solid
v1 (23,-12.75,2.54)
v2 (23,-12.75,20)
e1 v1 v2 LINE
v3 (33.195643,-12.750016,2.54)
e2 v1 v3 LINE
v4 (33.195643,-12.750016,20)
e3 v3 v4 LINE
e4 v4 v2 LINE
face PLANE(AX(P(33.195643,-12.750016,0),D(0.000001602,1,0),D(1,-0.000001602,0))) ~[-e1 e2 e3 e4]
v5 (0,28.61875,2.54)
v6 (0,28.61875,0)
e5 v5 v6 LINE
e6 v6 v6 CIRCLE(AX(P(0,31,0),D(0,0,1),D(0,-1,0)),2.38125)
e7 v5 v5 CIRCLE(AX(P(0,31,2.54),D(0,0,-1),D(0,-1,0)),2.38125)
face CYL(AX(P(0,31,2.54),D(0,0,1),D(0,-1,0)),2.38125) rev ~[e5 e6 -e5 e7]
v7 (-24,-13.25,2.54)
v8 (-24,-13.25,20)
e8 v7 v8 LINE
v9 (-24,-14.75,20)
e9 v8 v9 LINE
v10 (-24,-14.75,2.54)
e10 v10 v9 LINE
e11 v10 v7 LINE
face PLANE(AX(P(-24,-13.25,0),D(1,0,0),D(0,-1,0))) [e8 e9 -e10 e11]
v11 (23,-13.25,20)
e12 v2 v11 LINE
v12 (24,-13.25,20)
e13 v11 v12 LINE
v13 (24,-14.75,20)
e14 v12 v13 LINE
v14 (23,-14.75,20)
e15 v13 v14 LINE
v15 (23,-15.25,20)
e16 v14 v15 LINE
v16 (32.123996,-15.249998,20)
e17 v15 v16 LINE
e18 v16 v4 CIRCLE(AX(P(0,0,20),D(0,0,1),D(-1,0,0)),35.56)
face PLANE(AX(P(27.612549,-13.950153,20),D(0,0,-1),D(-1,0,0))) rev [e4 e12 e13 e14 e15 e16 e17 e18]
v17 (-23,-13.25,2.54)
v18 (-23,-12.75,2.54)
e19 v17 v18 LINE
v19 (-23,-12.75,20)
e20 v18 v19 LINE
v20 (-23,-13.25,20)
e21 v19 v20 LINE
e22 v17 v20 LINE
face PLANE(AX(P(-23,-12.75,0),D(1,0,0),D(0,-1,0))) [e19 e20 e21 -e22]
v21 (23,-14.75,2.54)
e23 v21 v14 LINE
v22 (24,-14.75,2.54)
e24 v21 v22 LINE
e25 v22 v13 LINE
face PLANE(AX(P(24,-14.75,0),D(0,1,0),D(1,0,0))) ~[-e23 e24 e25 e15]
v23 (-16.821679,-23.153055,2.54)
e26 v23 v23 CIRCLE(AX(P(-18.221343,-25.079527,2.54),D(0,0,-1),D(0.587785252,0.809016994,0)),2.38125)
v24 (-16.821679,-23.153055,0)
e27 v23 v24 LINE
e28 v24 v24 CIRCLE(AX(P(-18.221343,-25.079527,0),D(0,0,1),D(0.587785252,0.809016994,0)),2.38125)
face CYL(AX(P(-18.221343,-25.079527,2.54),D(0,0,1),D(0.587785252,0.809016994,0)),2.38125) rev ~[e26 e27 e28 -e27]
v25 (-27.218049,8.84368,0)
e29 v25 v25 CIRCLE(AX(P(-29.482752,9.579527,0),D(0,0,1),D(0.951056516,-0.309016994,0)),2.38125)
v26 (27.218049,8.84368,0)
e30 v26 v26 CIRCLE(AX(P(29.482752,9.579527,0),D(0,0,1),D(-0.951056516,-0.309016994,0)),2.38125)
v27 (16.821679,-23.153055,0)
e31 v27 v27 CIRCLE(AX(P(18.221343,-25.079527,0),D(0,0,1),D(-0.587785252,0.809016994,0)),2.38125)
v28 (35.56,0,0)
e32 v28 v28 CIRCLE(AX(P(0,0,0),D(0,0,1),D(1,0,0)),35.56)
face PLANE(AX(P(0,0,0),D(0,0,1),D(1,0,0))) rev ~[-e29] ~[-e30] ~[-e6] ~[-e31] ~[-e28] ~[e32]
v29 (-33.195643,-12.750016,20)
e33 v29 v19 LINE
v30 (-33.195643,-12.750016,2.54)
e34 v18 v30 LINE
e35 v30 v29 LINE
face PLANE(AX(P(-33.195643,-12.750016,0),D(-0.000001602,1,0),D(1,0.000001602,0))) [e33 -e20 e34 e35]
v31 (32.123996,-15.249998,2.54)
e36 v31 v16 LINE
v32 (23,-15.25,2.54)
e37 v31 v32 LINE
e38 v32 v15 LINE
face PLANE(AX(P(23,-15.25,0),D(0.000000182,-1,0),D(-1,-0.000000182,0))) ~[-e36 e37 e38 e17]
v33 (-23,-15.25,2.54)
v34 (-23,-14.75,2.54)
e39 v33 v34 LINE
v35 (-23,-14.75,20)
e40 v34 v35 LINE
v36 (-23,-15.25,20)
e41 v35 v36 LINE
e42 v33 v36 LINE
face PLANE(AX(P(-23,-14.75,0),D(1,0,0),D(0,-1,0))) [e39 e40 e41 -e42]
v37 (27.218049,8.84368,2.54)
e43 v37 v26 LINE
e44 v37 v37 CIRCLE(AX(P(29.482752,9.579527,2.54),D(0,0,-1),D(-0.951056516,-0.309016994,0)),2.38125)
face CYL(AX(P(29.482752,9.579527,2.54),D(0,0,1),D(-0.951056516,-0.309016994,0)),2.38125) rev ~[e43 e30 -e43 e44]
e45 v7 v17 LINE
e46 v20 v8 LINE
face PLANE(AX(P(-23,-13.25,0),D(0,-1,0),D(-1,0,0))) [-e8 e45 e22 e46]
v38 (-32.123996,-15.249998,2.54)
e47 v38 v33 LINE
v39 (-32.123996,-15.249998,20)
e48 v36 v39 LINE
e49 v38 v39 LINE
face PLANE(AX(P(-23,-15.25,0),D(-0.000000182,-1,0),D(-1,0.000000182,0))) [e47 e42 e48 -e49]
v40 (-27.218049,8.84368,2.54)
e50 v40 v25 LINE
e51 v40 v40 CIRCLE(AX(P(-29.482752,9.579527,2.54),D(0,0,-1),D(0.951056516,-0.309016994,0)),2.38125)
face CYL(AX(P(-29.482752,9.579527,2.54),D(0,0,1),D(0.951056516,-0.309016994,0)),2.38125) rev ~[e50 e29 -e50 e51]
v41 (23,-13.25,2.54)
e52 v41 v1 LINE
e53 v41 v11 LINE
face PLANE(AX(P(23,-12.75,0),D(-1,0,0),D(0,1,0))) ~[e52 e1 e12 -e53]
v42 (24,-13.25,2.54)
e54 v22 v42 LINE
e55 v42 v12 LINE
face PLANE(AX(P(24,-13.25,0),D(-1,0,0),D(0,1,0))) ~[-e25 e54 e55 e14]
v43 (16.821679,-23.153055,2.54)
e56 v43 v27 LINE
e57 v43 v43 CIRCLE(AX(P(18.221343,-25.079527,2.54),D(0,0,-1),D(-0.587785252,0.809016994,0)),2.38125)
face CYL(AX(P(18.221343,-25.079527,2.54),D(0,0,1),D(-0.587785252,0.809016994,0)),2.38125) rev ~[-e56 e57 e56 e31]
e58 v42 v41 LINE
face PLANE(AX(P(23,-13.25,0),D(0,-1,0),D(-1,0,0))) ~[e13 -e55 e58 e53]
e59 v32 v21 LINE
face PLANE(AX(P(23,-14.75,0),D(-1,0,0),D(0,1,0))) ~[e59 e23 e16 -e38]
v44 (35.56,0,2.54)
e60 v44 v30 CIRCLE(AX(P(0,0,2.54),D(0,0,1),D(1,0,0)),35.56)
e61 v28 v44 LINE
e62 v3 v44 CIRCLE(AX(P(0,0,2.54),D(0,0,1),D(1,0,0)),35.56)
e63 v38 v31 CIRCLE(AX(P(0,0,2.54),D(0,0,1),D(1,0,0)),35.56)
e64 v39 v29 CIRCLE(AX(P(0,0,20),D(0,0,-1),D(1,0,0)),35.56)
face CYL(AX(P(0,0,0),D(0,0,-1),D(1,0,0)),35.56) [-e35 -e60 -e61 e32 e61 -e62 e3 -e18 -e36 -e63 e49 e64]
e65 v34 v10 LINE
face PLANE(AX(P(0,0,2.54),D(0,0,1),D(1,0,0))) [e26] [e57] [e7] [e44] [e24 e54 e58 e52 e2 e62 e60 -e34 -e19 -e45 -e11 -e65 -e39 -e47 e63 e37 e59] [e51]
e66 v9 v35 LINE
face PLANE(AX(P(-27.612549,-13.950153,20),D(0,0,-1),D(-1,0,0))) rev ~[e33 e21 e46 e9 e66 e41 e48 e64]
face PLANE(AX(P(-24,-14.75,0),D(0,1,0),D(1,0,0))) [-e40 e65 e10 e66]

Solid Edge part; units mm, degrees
sketch "Sketch1" plane through (0, 0, 0) normal (0, 0, 1) x (1, 0, 0)
  circle A0 centre (0, 0) radius 35.56
extrude "Protrusion1" add sketch "Sketch1" along normal blind 2.54
sketch "Sketch2" plane through (0, 0, 0) normal (0, 0, -1) x (1, 0, 0)
  line L0 (-33.1956, 12.75) -> (-23, 12.75)
  line L1 (-23, 12.75) -> (-23, 13.25)
  line L2 (-23, 13.25) -> (-24, 13.25)
  line L3 (-24, 13.25) -> (-24, 14.75)
  line L4 (-24, 14.75) -> (-23, 14.75)
  line L5 (-23, 14.75) -> (-23, 15.25)
  line L6 (-23, 15.25) -> (-32.124, 15.25)
  arc A0 (-32.124, 15.25) -> (-33.1956, 12.75) centre (0, 0) ccw
extrude "ExtrudedProtrusion_2" add sketch "Sketch2" against normal blind 20
extrude "Cutout1" [suppressed]
hole "Hole_5" at (0, 31, 2.54) direction (0, 0, -1) diameter 4.7625 end up to next
mirror "Mirror1" about plane through (0, 0, 0) normal (1, 0, 0) of "ExtrudedProtrusion_2"
pattern_circular "Pattern1" count 5 over 360 about axis through (0, 0, 2.54) along (0, 0, -1) of "Hole_5"
